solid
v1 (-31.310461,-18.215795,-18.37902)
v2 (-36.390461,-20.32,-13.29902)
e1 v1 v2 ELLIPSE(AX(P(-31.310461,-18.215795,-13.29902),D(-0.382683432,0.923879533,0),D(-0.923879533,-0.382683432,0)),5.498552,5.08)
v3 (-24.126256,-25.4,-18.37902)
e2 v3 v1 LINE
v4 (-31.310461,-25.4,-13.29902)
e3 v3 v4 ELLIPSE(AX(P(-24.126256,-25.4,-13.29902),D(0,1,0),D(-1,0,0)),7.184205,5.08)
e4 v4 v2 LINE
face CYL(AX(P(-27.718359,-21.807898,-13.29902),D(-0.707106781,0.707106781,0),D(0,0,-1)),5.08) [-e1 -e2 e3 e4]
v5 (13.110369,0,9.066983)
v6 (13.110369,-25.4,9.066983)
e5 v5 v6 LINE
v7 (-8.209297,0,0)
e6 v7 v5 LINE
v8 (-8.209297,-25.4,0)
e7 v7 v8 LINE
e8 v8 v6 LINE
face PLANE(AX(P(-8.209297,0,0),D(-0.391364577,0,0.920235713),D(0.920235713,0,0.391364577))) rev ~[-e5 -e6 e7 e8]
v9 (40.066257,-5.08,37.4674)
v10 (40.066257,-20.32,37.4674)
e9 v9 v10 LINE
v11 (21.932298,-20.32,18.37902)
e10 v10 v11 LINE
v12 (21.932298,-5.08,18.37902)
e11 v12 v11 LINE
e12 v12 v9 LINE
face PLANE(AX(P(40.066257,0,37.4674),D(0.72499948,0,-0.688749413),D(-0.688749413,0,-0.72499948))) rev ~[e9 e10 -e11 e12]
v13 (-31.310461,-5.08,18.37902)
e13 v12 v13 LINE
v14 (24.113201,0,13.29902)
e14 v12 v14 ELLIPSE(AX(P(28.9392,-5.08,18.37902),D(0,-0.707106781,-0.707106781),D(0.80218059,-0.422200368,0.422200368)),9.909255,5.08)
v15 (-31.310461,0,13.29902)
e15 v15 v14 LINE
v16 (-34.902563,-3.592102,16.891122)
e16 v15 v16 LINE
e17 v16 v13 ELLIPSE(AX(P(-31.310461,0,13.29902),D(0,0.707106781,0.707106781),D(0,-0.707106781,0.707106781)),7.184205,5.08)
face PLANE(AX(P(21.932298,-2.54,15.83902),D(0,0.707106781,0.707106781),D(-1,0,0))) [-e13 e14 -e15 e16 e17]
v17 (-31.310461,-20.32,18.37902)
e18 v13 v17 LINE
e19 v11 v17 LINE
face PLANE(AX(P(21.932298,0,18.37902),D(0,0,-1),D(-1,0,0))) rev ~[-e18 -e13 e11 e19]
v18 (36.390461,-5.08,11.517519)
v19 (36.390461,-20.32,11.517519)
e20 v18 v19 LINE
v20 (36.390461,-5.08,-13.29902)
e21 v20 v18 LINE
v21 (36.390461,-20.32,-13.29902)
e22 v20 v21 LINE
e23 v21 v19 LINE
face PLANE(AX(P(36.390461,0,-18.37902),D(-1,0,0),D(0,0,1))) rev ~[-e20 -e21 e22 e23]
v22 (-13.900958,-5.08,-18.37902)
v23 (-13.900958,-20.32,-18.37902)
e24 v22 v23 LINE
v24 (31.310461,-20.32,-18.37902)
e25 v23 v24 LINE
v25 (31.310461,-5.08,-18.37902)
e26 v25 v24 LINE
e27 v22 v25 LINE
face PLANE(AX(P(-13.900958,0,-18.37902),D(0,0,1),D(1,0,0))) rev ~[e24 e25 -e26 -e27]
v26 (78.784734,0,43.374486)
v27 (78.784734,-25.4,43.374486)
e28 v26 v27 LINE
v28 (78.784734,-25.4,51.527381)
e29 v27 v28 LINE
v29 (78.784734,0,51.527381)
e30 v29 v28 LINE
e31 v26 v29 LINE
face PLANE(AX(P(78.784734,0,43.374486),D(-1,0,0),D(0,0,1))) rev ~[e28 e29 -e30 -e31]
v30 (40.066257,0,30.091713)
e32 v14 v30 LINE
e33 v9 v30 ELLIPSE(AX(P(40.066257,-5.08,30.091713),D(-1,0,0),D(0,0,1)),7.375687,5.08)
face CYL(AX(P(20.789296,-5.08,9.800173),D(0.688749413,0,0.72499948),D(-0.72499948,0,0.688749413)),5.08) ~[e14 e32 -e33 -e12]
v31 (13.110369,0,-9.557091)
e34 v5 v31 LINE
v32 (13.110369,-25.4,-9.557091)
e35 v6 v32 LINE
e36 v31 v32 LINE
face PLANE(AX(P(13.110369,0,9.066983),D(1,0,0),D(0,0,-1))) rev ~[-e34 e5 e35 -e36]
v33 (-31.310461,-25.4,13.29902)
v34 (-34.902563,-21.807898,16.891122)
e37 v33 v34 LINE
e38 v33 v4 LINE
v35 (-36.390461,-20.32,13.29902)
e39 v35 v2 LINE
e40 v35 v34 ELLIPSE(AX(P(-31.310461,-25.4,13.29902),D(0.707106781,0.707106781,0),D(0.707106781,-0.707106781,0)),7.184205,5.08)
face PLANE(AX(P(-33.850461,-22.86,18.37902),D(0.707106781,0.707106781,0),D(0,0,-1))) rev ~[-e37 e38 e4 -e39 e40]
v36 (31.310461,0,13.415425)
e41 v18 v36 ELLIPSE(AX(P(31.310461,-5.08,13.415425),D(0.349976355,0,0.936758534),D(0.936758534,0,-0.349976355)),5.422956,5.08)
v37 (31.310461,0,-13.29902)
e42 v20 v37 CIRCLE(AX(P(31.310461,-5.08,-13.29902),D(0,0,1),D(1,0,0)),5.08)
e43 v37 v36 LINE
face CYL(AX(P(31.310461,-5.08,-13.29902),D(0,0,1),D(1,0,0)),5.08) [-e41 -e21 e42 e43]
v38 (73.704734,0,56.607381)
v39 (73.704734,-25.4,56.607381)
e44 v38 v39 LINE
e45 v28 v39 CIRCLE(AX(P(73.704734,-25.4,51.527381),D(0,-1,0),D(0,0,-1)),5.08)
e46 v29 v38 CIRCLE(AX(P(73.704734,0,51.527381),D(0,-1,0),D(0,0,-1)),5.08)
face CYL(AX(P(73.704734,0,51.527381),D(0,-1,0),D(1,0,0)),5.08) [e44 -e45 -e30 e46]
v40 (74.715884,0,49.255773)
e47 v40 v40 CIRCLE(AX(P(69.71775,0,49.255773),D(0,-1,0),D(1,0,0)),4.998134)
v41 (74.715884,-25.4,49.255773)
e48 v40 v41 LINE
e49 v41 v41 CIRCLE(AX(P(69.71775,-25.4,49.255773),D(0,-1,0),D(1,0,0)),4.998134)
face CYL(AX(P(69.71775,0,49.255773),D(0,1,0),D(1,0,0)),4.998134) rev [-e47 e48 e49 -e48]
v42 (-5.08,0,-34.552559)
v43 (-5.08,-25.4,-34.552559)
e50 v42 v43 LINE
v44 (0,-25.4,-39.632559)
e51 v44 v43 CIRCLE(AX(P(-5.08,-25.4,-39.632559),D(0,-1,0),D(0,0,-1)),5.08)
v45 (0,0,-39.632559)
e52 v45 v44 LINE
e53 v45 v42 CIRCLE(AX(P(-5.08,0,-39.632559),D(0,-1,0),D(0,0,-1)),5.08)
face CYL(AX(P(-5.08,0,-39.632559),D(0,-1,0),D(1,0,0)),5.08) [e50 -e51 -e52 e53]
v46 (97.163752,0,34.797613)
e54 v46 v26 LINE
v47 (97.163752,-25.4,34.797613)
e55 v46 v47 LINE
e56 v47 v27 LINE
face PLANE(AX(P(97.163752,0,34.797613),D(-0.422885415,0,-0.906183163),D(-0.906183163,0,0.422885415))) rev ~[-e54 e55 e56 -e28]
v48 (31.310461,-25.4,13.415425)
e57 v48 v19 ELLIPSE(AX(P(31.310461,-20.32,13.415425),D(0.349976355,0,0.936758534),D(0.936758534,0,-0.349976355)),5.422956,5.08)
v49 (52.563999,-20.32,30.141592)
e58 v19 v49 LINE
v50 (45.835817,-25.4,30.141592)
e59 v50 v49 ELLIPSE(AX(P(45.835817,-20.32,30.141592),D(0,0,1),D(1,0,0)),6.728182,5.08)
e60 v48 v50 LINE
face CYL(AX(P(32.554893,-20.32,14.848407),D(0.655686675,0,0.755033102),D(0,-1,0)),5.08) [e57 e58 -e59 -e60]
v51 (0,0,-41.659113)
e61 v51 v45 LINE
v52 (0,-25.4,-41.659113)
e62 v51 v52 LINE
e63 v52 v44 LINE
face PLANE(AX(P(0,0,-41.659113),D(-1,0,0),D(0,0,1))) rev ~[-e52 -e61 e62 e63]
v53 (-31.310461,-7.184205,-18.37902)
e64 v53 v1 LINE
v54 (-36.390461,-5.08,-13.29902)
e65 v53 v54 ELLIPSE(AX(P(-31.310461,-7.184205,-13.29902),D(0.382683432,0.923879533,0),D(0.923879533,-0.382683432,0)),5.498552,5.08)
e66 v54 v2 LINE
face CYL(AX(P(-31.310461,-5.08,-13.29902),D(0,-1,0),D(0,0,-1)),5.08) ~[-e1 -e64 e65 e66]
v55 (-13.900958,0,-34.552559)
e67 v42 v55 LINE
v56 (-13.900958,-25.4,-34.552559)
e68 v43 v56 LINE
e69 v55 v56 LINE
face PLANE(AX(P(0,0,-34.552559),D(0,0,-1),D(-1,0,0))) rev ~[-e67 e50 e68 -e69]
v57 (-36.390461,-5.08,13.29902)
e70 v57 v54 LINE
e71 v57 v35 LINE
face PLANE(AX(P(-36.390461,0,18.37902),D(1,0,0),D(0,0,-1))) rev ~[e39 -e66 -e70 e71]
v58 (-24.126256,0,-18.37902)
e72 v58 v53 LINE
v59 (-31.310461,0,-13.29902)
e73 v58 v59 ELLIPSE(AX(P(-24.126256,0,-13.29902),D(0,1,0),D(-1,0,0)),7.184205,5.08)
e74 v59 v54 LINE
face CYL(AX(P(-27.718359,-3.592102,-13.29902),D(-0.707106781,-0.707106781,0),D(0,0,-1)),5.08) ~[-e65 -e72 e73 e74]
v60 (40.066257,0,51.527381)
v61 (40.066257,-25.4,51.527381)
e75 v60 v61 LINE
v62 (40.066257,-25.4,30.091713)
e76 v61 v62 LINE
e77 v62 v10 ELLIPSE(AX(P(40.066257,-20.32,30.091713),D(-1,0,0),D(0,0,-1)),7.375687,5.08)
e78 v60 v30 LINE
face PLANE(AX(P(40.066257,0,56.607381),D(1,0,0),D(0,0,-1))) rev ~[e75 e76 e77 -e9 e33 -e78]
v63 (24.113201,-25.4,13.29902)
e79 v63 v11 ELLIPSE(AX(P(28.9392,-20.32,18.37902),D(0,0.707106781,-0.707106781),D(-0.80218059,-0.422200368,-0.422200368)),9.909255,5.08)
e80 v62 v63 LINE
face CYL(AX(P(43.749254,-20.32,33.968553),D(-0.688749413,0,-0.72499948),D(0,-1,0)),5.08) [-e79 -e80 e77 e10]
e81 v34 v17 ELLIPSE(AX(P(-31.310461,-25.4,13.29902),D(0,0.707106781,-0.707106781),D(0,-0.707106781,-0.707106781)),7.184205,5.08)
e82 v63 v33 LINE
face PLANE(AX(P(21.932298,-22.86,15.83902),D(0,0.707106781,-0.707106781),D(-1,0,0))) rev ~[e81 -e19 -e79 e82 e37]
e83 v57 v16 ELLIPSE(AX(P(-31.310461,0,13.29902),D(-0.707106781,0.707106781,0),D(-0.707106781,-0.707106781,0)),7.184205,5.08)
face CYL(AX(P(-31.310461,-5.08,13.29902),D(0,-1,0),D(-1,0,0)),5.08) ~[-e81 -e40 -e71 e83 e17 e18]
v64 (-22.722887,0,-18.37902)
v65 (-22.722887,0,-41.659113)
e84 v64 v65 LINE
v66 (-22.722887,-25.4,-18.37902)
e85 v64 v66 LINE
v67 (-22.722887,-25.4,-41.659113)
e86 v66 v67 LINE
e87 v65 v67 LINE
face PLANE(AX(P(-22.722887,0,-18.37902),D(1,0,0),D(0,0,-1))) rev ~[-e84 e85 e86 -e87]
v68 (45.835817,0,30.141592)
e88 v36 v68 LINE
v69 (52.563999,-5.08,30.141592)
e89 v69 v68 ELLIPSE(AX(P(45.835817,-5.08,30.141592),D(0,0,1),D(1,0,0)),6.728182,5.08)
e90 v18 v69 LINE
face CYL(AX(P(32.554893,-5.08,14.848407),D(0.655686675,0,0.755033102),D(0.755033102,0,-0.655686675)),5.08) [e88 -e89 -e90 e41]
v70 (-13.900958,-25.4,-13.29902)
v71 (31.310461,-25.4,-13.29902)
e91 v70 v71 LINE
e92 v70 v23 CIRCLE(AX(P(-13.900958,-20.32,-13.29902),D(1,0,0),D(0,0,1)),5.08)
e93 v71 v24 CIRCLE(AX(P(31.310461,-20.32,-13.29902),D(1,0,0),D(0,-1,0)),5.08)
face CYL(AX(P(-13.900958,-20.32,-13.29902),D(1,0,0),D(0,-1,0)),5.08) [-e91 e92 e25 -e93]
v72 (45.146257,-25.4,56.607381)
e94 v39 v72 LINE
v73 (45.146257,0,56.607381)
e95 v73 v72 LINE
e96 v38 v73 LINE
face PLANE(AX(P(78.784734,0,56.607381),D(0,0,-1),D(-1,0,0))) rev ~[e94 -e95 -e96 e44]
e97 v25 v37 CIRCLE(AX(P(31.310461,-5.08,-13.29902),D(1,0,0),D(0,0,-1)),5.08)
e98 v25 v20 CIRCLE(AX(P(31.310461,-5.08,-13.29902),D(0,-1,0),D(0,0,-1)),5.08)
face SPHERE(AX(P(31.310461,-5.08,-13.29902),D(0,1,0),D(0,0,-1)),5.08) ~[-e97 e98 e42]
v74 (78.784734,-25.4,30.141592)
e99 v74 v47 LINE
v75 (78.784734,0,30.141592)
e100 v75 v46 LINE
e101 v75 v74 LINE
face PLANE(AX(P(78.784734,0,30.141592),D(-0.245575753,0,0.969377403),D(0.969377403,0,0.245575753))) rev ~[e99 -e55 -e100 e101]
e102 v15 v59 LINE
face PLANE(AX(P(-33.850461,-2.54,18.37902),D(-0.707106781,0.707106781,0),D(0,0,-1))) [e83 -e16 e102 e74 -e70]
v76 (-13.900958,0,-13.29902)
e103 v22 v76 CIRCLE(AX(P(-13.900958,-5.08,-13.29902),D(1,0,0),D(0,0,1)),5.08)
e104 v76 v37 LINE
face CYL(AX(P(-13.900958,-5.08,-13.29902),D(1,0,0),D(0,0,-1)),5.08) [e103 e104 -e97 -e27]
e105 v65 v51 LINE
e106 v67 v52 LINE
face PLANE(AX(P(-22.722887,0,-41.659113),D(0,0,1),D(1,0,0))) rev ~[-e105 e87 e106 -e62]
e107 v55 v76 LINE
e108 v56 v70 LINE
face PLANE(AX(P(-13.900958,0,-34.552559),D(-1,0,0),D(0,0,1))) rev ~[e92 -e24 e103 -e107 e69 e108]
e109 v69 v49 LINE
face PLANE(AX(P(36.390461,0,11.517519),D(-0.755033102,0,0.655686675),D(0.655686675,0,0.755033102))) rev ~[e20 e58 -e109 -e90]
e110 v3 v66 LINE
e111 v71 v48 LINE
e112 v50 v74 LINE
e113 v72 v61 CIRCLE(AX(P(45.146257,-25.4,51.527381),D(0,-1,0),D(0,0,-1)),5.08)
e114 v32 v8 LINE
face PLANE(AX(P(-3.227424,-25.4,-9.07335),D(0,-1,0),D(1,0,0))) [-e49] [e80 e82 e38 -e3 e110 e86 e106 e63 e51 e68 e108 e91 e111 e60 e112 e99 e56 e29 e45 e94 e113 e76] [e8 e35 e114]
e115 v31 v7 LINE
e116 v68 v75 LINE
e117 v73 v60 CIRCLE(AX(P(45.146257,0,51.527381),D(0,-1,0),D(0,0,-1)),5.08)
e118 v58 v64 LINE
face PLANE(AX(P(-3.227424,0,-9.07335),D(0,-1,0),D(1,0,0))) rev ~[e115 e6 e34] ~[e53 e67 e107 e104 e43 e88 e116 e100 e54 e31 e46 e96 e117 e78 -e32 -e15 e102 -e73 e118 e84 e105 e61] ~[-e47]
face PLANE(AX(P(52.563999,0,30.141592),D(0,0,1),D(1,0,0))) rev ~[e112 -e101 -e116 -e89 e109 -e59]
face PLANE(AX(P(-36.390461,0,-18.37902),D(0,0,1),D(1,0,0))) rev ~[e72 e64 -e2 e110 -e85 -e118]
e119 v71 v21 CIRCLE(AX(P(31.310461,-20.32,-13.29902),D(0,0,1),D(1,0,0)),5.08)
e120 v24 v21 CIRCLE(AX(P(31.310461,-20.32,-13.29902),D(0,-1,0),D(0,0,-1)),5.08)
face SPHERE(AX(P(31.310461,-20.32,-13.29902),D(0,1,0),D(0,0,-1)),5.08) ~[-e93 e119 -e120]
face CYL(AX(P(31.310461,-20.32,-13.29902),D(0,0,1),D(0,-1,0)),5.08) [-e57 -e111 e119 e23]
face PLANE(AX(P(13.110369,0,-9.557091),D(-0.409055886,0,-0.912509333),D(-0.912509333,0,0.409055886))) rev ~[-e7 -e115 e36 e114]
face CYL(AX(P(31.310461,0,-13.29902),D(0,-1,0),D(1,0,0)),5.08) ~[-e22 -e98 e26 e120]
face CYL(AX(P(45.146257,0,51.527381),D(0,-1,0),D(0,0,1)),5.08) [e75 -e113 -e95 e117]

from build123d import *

# Parameters (mm, degrees)
F0_R     = 4.998133971
F1_DEPTH = 25.4
F2_R     = 5.08
F3_SIZE  = 5.08
F4_SIZE  = 5.08
F5_R     = 5.08
F6_R     = 5.08
F7_R     = 5.08
F8_R     = 5.08
F9_R     = 5.08


with BuildPart() as f1:
    # F0 (on Front) → F1 (new body)
    with BuildSketch(Plane.XZ):
        Polygon((-13.9009580016, -18.3790195733), (36.3904610276, -18.3790195733), (36.3904610276, 11.5175191313), (36.3904610276, 18.3790195733), (21.9322983176, 18.3790195733), (-36.3904610276, 18.3790195733), (-36.3904610276, -18.3790195733), (-22.7228868753, -18.3790195733), (-22.7228868753, -41.6591130197), (0, -41.6591130197), (0, -34.5525592566), (-13.9009580016, -34.5525592566), align=None)
        Polygon((-8.2092965022, 0), (13.1103685126, 9.0669831261), (13.1103685126, -9.5570906997), align=None, mode=Mode.SUBTRACT)
        Polygon((36.3904610276, 18.3790195733), (36.3904610276, 11.5175191313), (52.5639988482, 30.1415920258), (78.7847340107, 30.1415920258), (78.7847340107, 43.3744862676), (78.7847340107, 56.6073805094), (40.0662571192, 56.6073805094), (40.0662571192, 37.4673998365), (21.9322983176, 18.3790195733), align=None)
        with Locations((69.7177499533, 49.2557734251)):
            Circle(F0_R, mode=Mode.SUBTRACT)
        Polygon((78.7847340107, 43.3744862676), (78.7847340107, 30.1415920258), (97.1637517214, 34.7976125777), align=None)
    extrude(amount=F1_DEPTH)

    # F2
    f2_edges = [f1.edges().sort_by_distance(p)[0] for p in [
        (0, -12.7, -34.552559),
    ]]
    fillet(f2_edges, radius=F2_R)

    # F3
    f3_edges = [f1.edges().sort_by_distance(p)[0] for p in [
        (-7.229081, -25.4, 18.37902),
        (-36.390461, -25.4, 0),
    ]]
    chamfer(f3_edges, length=F3_SIZE)

    # F4
    f4_edges = [f1.edges().sort_by_distance(p)[0] for p in [
        (-7.229081, 0, 18.37902),
        (-36.390461, 0, 0),
    ]]
    chamfer(f4_edges, length=F4_SIZE)

    # F5
    f5_edges = [f1.edges().sort_by_distance(p)[0] for p in [
        (-36.390461, -12.7, 18.37902),
    ]]
    fillet(f5_edges, radius=F5_R)

    # F6
    f6_edges = [f1.edges().sort_by_distance(p)[0] for p in [
        (78.784734, -12.7, 56.607381),
        (40.066257, -12.7, 56.607381),
    ]]
    fillet(f6_edges, radius=F6_R)

    # F7
    f7_edges = [f1.edges().sort_by_distance(p)[0] for p in [
        (36.390461, -12.7, -18.37902),
    ]]
    fillet(f7_edges, radius=F7_R)

    # F8
    f8_edges = [f1.edges().sort_by_distance(p)[0] for p in [
        (-36.390461, -12.7, -18.37902),
        (-33.850461, -22.86, -18.37902),
        (-33.850461, -2.54, -18.37902),
    ]]
    fillet(f8_edges, radius=F8_R)

    # F9
    f9_edges = [f1.edges().sort_by_distance(p)[0] for p in [
        (30.999278, -25.4, 27.92321),
        (30.999278, 0, 27.92321),
        (44.47723, -25.4, 20.829556),
        (36.390461, -25.4, -0.89075),
        (44.47723, 0, 20.829556),
        (36.390461, 0, -0.89075),
    ]]
    fillet(f9_edges, radius=F9_R)


solid = f1.part
